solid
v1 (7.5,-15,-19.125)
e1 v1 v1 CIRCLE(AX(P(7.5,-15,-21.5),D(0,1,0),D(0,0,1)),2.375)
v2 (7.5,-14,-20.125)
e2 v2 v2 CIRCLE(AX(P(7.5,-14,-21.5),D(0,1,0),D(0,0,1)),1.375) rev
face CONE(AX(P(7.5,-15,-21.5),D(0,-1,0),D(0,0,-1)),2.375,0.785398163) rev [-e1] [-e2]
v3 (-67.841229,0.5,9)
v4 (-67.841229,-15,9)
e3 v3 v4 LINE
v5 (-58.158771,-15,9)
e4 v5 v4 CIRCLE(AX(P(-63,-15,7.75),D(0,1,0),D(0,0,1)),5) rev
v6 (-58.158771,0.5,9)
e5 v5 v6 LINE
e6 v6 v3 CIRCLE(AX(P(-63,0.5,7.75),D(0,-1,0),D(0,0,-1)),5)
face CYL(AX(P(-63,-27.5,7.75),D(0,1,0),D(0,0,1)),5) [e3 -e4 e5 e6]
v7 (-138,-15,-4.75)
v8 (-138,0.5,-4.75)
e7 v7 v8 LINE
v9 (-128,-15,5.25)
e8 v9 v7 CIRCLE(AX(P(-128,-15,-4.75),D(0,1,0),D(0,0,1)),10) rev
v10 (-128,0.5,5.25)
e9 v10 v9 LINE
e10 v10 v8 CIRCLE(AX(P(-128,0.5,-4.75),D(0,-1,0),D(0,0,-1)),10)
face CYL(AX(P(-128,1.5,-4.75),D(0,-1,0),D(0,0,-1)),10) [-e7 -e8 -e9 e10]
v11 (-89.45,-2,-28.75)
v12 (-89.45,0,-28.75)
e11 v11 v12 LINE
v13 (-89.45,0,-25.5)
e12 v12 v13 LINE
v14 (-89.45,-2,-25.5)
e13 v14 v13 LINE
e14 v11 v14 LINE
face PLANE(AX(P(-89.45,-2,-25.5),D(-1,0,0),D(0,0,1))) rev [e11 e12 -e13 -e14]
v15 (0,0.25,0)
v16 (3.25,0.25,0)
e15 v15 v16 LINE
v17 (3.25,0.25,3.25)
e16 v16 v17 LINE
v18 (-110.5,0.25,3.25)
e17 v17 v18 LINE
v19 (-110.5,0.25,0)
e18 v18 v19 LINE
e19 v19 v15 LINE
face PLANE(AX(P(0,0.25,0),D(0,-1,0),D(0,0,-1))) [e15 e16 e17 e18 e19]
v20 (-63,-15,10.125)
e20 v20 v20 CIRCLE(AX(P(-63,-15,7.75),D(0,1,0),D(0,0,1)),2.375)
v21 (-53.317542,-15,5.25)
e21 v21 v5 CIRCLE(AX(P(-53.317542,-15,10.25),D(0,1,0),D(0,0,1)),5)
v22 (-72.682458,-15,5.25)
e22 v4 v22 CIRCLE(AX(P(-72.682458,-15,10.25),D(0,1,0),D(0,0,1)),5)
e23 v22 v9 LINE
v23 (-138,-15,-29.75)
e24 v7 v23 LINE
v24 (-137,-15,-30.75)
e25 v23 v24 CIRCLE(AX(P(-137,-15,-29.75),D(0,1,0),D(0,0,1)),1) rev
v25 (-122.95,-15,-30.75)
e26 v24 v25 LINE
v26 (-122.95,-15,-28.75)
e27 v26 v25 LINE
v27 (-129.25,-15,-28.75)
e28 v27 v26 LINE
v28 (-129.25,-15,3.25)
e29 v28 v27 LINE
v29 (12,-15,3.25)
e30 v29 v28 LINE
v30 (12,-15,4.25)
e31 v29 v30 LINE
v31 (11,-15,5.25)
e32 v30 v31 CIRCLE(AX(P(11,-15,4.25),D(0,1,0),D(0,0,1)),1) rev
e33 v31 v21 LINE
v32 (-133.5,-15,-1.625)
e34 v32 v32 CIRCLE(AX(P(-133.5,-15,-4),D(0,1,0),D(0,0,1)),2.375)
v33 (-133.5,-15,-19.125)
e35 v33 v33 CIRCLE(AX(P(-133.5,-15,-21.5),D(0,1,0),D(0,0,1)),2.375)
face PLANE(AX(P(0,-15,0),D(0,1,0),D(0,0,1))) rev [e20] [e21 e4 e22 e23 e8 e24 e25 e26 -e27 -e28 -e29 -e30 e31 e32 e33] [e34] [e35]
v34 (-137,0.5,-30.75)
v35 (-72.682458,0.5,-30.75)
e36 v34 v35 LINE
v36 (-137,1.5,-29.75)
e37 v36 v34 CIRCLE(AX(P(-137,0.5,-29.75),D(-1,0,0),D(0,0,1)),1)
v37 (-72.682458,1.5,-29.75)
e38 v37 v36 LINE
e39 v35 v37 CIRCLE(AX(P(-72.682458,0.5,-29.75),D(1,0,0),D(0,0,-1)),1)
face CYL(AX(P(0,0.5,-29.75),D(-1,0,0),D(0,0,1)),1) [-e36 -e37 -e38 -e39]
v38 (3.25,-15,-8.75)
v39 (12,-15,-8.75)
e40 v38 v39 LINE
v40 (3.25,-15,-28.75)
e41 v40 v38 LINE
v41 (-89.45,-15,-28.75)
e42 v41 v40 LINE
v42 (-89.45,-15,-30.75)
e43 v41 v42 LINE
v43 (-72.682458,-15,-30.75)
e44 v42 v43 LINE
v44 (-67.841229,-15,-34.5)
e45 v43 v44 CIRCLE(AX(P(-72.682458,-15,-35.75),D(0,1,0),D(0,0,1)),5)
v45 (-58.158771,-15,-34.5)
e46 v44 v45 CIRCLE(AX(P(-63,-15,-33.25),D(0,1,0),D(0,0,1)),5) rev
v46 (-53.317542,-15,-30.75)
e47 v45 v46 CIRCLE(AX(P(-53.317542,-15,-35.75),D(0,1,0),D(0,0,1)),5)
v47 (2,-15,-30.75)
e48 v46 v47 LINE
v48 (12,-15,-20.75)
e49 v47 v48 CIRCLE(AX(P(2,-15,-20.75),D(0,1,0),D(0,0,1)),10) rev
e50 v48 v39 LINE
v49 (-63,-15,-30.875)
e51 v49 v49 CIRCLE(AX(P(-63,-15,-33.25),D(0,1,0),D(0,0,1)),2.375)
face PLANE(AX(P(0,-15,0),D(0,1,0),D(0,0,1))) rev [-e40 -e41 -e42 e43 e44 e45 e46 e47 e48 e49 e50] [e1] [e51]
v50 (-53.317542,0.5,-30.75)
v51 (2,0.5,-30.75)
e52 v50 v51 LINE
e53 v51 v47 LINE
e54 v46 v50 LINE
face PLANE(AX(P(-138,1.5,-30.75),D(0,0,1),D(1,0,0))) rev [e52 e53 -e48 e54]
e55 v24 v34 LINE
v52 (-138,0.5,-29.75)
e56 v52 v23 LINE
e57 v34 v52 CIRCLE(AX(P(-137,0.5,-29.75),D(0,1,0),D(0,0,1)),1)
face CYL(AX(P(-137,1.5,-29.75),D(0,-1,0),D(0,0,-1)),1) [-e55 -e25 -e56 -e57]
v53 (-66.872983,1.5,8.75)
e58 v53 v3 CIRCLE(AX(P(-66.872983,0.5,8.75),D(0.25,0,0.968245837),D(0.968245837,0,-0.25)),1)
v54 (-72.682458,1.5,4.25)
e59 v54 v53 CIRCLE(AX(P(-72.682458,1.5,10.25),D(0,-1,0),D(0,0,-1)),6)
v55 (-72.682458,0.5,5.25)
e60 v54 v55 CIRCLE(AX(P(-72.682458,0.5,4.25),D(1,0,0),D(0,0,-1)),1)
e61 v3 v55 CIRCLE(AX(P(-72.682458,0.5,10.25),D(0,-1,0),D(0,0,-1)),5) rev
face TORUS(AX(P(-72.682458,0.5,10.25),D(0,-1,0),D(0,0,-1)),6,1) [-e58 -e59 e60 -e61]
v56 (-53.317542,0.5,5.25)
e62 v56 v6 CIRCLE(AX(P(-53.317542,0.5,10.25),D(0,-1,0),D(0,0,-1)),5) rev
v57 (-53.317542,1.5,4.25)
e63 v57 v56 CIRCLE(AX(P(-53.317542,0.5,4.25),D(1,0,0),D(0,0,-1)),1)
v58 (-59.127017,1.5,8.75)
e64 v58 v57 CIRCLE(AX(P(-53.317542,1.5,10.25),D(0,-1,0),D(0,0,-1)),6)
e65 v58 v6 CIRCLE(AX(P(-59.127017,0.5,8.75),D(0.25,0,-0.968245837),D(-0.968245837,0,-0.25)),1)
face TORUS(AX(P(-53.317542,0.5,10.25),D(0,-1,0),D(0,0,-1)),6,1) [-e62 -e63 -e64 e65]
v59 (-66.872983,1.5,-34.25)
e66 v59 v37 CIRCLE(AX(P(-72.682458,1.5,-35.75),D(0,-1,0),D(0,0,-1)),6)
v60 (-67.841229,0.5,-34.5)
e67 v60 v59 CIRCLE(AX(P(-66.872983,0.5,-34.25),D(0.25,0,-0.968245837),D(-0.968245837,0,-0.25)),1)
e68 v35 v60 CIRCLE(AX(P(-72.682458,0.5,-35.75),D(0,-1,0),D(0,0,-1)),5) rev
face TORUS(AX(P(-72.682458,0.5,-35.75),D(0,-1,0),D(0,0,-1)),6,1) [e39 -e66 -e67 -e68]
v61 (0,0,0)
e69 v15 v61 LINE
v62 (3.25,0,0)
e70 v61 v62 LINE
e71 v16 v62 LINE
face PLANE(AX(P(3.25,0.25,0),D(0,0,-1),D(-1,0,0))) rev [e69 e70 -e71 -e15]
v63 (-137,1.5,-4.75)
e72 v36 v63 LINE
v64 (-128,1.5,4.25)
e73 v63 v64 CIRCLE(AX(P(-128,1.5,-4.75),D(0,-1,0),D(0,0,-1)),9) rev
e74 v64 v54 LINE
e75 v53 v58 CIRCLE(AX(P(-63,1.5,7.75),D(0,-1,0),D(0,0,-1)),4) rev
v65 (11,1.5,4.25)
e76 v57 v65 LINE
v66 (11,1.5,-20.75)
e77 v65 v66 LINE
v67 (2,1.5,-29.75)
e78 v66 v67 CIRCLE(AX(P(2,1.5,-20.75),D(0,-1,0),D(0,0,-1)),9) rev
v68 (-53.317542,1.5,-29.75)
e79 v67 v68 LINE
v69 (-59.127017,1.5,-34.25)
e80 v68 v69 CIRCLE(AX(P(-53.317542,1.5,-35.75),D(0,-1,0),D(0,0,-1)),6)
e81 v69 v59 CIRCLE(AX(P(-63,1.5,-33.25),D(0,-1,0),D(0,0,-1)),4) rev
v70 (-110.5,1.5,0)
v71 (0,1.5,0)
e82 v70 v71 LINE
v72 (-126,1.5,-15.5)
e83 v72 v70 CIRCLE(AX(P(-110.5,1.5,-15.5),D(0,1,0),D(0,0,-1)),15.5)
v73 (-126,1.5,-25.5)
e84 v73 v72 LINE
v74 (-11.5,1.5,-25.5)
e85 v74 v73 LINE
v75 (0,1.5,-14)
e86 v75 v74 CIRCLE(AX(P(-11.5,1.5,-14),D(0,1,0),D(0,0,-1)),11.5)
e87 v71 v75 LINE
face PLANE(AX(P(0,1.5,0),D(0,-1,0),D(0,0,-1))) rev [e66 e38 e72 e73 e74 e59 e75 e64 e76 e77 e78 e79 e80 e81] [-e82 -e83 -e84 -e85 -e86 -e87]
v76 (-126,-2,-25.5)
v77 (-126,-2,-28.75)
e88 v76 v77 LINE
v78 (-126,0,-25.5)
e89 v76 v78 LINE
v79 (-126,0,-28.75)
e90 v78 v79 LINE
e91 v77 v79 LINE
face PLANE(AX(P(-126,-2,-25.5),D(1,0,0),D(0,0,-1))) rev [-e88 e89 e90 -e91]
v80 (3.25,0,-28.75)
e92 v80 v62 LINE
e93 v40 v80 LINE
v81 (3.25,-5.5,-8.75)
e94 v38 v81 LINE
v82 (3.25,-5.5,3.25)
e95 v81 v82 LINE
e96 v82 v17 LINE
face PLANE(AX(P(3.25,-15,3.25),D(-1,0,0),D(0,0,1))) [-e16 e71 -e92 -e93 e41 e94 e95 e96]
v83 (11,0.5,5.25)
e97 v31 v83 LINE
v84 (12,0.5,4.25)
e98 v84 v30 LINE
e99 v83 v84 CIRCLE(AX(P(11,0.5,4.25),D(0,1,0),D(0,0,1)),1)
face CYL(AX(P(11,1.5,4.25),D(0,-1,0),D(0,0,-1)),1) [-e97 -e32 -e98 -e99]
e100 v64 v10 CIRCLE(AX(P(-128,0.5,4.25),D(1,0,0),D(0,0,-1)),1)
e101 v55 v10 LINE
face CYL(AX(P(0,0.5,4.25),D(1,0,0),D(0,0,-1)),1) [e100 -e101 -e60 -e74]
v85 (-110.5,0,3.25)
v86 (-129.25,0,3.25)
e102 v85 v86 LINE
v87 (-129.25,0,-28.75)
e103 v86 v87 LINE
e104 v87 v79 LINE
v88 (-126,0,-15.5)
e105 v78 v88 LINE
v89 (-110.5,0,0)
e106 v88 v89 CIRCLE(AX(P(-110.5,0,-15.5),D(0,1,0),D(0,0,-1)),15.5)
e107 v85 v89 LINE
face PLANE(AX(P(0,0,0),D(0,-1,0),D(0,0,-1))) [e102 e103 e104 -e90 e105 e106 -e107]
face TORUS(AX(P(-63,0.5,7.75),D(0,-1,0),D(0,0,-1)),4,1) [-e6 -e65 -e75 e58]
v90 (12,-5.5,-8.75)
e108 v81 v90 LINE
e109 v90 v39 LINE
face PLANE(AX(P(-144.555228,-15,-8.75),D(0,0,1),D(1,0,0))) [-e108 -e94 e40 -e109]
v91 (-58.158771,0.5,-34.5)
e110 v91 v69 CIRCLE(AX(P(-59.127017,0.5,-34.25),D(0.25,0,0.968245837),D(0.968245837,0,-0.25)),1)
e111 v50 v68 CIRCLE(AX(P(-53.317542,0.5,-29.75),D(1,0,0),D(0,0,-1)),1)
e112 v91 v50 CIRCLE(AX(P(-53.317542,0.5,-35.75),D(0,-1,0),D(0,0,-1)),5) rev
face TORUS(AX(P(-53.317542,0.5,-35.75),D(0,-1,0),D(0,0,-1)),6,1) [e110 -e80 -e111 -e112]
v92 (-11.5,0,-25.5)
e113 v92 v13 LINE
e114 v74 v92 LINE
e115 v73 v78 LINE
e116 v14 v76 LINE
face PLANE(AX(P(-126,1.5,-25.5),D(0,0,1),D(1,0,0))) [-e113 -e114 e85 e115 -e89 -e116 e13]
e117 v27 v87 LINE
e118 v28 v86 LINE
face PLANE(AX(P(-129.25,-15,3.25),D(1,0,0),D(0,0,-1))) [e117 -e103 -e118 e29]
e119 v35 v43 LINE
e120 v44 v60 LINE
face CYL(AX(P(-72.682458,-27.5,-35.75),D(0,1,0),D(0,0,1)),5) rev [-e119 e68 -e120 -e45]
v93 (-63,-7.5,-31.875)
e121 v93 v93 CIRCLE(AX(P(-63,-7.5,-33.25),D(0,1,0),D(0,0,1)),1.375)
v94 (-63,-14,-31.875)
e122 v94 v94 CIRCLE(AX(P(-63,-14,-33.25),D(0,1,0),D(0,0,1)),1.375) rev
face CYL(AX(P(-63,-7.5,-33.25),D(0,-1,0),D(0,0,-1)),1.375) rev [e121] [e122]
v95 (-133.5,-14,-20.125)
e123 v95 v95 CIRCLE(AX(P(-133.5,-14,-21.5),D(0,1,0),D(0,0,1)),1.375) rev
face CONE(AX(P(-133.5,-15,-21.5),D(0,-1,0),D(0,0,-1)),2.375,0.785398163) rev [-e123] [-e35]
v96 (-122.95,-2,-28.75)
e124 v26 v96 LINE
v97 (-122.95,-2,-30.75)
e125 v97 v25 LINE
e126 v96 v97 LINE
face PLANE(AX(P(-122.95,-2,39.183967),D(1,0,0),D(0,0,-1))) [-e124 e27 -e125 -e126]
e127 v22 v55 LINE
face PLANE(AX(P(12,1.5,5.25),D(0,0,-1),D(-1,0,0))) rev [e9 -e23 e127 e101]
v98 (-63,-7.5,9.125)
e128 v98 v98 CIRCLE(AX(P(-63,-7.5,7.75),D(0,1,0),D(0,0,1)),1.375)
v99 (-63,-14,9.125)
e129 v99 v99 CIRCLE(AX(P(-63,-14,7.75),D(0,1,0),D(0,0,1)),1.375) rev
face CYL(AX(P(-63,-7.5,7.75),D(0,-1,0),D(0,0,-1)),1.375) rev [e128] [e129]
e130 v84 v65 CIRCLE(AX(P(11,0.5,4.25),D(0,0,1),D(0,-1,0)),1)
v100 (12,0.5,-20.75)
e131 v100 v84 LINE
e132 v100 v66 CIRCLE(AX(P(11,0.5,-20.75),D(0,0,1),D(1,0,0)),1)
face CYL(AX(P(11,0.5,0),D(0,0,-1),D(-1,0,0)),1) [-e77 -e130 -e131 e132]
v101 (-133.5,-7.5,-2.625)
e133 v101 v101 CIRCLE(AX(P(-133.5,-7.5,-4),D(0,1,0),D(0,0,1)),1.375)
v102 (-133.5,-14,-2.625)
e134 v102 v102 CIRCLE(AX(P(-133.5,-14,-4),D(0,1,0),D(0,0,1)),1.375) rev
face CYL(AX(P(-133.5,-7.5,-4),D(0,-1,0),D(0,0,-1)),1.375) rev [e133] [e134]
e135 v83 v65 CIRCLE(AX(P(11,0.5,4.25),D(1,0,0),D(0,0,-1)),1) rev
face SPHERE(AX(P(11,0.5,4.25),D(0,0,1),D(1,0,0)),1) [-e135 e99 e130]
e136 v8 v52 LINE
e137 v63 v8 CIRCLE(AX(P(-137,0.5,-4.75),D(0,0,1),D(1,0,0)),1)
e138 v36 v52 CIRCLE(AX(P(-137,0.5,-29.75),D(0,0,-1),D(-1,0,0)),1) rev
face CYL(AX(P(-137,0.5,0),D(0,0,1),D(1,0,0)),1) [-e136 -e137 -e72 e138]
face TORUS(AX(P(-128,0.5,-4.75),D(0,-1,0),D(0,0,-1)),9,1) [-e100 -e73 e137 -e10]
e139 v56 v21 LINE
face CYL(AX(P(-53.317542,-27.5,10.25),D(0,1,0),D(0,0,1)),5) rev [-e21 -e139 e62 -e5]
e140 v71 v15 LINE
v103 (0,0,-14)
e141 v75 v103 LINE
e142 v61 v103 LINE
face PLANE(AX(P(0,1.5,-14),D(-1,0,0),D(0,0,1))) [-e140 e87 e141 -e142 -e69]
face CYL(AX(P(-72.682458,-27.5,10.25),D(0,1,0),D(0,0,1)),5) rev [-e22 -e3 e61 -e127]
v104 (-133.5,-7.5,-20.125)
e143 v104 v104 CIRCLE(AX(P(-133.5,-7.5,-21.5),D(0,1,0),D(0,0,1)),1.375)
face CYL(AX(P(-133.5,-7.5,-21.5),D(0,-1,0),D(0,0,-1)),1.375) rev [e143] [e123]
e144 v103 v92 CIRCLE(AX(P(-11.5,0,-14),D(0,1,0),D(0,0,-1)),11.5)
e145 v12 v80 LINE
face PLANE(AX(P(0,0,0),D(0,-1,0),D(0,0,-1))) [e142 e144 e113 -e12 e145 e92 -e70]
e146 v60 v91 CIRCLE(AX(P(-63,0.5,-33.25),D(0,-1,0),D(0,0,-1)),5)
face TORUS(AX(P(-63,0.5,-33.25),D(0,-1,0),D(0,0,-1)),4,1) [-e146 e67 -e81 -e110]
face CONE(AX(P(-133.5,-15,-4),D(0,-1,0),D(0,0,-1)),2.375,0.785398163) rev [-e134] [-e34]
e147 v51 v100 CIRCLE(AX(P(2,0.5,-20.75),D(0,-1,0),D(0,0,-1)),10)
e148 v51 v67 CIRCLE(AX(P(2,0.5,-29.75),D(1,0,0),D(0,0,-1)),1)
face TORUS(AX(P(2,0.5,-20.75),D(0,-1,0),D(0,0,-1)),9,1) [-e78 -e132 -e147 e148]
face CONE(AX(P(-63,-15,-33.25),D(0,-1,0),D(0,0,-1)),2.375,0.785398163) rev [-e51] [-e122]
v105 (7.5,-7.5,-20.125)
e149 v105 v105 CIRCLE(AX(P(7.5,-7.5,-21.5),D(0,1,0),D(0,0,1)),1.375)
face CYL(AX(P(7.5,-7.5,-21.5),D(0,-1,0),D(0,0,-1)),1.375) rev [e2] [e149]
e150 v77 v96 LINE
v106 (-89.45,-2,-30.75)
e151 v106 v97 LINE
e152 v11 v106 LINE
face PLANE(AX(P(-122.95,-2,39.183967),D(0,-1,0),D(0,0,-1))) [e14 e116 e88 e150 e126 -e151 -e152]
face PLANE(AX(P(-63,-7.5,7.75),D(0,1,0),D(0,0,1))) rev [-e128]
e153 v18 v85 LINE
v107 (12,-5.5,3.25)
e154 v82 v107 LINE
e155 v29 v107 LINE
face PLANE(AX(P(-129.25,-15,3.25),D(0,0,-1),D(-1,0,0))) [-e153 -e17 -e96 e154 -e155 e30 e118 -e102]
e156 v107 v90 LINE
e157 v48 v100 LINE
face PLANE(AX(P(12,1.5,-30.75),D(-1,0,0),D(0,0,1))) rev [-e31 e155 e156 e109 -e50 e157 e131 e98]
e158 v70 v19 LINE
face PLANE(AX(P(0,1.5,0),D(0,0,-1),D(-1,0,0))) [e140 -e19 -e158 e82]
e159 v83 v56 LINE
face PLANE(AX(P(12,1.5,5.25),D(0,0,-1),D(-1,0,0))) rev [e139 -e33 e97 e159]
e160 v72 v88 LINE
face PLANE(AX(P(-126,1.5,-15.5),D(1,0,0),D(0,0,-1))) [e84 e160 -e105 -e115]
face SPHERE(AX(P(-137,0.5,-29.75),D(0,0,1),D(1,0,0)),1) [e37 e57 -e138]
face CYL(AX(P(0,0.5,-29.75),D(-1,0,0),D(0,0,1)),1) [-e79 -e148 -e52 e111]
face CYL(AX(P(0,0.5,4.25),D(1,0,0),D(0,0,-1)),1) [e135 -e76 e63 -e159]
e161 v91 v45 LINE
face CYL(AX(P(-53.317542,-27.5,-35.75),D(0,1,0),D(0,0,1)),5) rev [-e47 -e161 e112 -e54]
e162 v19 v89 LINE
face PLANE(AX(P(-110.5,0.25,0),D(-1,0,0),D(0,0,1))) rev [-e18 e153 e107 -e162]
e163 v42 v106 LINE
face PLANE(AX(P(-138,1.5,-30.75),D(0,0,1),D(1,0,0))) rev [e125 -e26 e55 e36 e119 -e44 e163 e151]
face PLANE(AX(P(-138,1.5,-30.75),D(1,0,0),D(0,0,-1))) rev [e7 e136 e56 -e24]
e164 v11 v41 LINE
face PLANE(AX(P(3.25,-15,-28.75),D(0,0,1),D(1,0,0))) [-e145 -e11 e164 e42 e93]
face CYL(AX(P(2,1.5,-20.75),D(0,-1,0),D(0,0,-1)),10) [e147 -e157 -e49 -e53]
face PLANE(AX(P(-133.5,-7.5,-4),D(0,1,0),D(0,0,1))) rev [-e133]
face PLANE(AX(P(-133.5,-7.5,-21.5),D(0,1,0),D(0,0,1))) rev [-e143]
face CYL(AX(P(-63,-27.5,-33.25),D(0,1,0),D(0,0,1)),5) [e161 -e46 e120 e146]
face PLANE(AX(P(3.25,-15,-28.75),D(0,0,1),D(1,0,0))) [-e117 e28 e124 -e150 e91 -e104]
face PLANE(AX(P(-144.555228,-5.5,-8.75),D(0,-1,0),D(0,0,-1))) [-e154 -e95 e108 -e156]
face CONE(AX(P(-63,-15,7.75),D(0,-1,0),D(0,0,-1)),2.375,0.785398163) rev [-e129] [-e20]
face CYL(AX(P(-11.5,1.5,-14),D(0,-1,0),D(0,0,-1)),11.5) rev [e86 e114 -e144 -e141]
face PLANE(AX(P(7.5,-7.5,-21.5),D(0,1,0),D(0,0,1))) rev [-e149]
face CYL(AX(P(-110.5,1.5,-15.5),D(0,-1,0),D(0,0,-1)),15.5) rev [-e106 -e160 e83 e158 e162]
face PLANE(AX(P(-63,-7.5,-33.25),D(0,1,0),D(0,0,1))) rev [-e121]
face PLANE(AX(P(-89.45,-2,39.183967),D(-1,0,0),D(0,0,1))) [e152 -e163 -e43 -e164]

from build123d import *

# Parameters (mm, degrees)
SKETCH1_W           = 150
SKETCH1_H           = 36
BOSS_EXTRUDE1_DEPTH = 1.5
SKETCH2_W           = 150
SKETCH2_H           = 36
SKETCH2_W_2         = 132.5
SKETCH2_H_2         = 32
BOSS_EXTRUDE2_DEPTH = 15
SKETCH3_W           = 12
SKETCH3_H           = 9.5
CUT_EXTRUDE1_DEPTH  = 8.75
SKETCH4_W           = 33.5
SKETCH4_H           = 13
CUT_EXTRUDE2_DEPTH  = 2
BOSS_EXTRUDE4_DEPTH = 16.5
FILLET1_R           = 10
SKETCH5_R           = 1.375
CUT_EXTRUDE3_DEPTH  = 7.5
SKETCH8_W           = 36.55
SKETCH8_H           = 3.25
BOSS_EXTRUDE3_DEPTH = 2
FILLET2_R           = 5
FILLET3_R           = 1
CHAMFER1_SIZE       = 1
SKETCH10_W          = 113.75
SKETCH10_H          = 3.25
CUT_EXTRUDE4_DEPTH  = 0.25


with BuildPart() as part:
    # Sketch1 → Boss-Extrude1 (new body)
    with BuildSketch(Plane(origin=(0, 0, 0), x_dir=(1, 0, 0), z_dir=(0, 1, 0))):
        with Locations((-63, 12.75)):
            Rectangle(SKETCH1_W, SKETCH1_H)
        with BuildLine():
            Line((0, 0), (-110.5, 0))
            ThreePointArc((-110.5, 0), (-121.460155108, 4.539844892), (-126, 15.5))
            Line((-126, 15.5), (-126, 25.5))
            Line((-126, 25.5), (-11.5, 25.5))
            ThreePointArc((-11.5, 25.5), (-3.368272016, 22.131727984), (0, 14))
            Line((0, 14), (0, 0))
        make_face(mode=Mode.SUBTRACT)
    extrude(amount=BOSS_EXTRUDE1_DEPTH)

    # Sketch2 → Boss-Extrude2 (add)
    with BuildSketch(Plane.XZ):
        with Locations((-63, -12.75)):
            Rectangle(SKETCH2_W, SKETCH2_H)
        with Locations((-63, -12.75)):
            Rectangle(SKETCH2_W_2, SKETCH2_H_2, mode=Mode.SUBTRACT)
    extrude(amount=BOSS_EXTRUDE2_DEPTH)

    # Sketch3 → Cut-Extrude1 (cut)
    with BuildSketch(Plane.ZY.offset(-12)):
        with Locations((-2.75, -10.25)):
            Rectangle(SKETCH3_W, SKETCH3_H)
    extrude(amount=CUT_EXTRUDE1_DEPTH, mode=Mode.SUBTRACT)

    # Sketch4 → Cut-Extrude2 (cut)
    with BuildSketch(Plane.XY.offset(-30.75)):
        with Locations((-106.2, -8.5)):
            Rectangle(SKETCH4_W, SKETCH4_H)
    extrude(amount=CUT_EXTRUDE2_DEPTH, mode=Mode.SUBTRACT)

    # Sketch9 → Boss-Extrude4 (add)
    with BuildSketch(Plane(origin=(0, 1.5, 0), x_dir=(1, 0, 0), z_dir=(0, 1, 0))):
        with BuildLine():
            Line((-68, 33.25), (-68, 30.75))
            Line((-68, 30.75), (-58, 30.75))
            Line((-58, 30.75), (-58, 33.25))
            ThreePointArc((-58, 33.25), (-63, 38.25), (-68, 33.25))
        make_face()
        with BuildLine():
            Line((-58, -7.75), (-58, -5.25))
            Line((-58, -5.25), (-68, -5.25))
            Line((-68, -5.25), (-68, -7.75))
            ThreePointArc((-68, -7.75), (-63, -12.75), (-58, -7.75))
        make_face()
    extrude(amount=-BOSS_EXTRUDE4_DEPTH)

    # Fillet1
    fillet1_edges = [part.edges().sort_by_distance(p)[0] for p in [
        (12, -6.75, -30.75),
        (-138, -6.75, 5.25),
    ]]
    fillet(fillet1_edges, radius=FILLET1_R)

    # Sketch5 → Cut-Extrude3 (cut)
    with BuildSketch(Plane(origin=(0, -15, 0), x_dir=(1, 0, 0), z_dir=(0, 1, 0))):
        with Locations(Location((7.5, 21.5, 0), (0, 0, 270))):
            Circle(SKETCH5_R)
        with Locations((7.5, 4)):
            Circle(SKETCH5_R)
        with Locations(Location((-133.5, 4, 0), (0, 0, 270))):
            Circle(SKETCH5_R)
        with Locations(Location((-133.5, 21.5, 0), (0, 0, 270))):
            Circle(SKETCH5_R)
        with Locations(Location((-63, -7.75, 0), (0, 0, 270))):
            Circle(SKETCH5_R)
        with Locations(Location((-63, 33.25, 0), (0, 0, 270))):
            Circle(SKETCH5_R)
    extrude(amount=CUT_EXTRUDE3_DEPTH, mode=Mode.SUBTRACT)

    # Sketch8 → Boss-Extrude3 (add)
    with BuildSketch(Plane.XZ):
        with Locations((-107.725, -27.125)):
            Rectangle(SKETCH8_W, SKETCH8_H)
    extrude(amount=BOSS_EXTRUDE3_DEPTH)

    # Fillet2
    # the kernel refuses this fillet: 5 mm, written as the material it adds along each edge
    with BuildSketch(Plane(origin=(-58, 1.5, -30.75), x_dir=(1, 0, 0), z_dir=(0, -1, 0)), Plane(origin=(-68, 1.5, 5.25), x_dir=(-1, 0, 0), z_dir=(0, -1, 0))) as fillet2_piece_1:
        with BuildLine():
            CenterArc((4.682458366, -5), FILLET2_R, 90, 75.522487814)
            Line((-0.158770817, -3.75), (-0.642893736, -3.625))
            ThreePointArc((-0.642893736, -3.625), (-0.5, -2.5), (-0.5, 0))
            Line((-0.5, 0), (0, 0.5))
            Line((0, 0.5), (4.682458366, 0.5))
            Line((4.682458366, 0.5), (4.682458366, 0))
        make_face()
    extrude(amount=16.5)
    with BuildSketch(Plane(origin=(-68, 1.5, -30.75), x_dir=(-1, 0, 0), z_dir=(0, -1, 0))) as fillet2_piece_2:
        with BuildLine():
            CenterArc((4.682458366, 5), FILLET2_R, 194.477512186, 75.522487814)
            Line((-0.158770817, 3.75), (-0.642893736, 3.625))
            ThreePointArc((-0.642893736, 3.625), (-0.5, 2.5), (-0.5, 0))
            Line((-0.5, 0), (0, -0.5))
            Line((0, -0.5), (4.682458366, -0.5))
            Line((4.682458366, -0.5), (4.682458366, 0))
        make_face()
    extrude(amount=16.5)
    with BuildSketch(Plane(origin=(-58, 1.5, 5.25), x_dir=(-0.0423009875968097, 0, 0.9991049126334705), z_dir=(0, -1, 0))) as fillet2_piece_3:
        with BuildLine():
            CenterArc((4.79745195, -4.889772094), FILLET2_R, 102.053120737, 75.522487814)
            Line((-0.198072613, -4.678267156), (-0.69762507, -4.657116662))
            Line((-0.69762507, -4.657116662), (-0.499552456, 0.021150494))
            Line((-0.499552456, 0.021150494), (0.021150494, 0.499552456))
            ThreePointArc((0.021150494, 0.499552456), (2.518912775, 0.393799987), (3.648950348, 0.488977209))
            Line((3.648950348, 0.488977209), (3.753359585, 0))
        make_face()
    extrude(amount=16.5)
    # the kernel refuses this fillet: 5 mm, written as the material it takes off along each edge

    # Fillet3
    fillet3_edges = [part.edges().sort_by_distance(p)[0] for p in [
        (-25.658770817, 1.5, -30.75),
        (-100.341229183, 1.5, 5.25),
        (-135.071067812, 1.5, 2.321067812),
        (9.071067812, 1.5, -27.821067812),
        (12, 1.5, -7.75),
        (-63, 1.5, 12.75),
        (-20.658770817, 1.5, 5.25),
        (-63, 1.5, -38.25),
        (-105.341229183, 1.5, -30.75),
        (-56.379403813, 1.5, 6.297152925),
        (-69.620596187, 1.5, 6.297152925),
        (-56.379403813, 1.5, -31.797152925),
        (-69.620596187, 1.5, -31.797152925),
        (-138, 1.5, -17.75),
        (-138, -6.75, -30.75),
        (12, -6.75, 5.25),
    ]]
    fillet(fillet3_edges, radius=FILLET3_R)

    # Chamfer1
    chamfer1_edges = [part.edges().sort_by_distance(p)[0] for p in [
        (-63, -15, -34.625),
        (-133.5, -15, -5.375),
        (-133.5, -15, -22.875),
        (-63, -15, 6.375),
        (7.5, -15, -22.875),
    ]]
    chamfer(chamfer1_edges, length=CHAMFER1_SIZE)

    # Sketch10 → Cut-Extrude4 (cut)
    with BuildSketch(Plane.XZ):
        with Locations((-53.625, 1.625)):
            Rectangle(SKETCH10_W, SKETCH10_H)
    extrude(amount=-CUT_EXTRUDE4_DEPTH, mode=Mode.SUBTRACT)


solid = part.part
